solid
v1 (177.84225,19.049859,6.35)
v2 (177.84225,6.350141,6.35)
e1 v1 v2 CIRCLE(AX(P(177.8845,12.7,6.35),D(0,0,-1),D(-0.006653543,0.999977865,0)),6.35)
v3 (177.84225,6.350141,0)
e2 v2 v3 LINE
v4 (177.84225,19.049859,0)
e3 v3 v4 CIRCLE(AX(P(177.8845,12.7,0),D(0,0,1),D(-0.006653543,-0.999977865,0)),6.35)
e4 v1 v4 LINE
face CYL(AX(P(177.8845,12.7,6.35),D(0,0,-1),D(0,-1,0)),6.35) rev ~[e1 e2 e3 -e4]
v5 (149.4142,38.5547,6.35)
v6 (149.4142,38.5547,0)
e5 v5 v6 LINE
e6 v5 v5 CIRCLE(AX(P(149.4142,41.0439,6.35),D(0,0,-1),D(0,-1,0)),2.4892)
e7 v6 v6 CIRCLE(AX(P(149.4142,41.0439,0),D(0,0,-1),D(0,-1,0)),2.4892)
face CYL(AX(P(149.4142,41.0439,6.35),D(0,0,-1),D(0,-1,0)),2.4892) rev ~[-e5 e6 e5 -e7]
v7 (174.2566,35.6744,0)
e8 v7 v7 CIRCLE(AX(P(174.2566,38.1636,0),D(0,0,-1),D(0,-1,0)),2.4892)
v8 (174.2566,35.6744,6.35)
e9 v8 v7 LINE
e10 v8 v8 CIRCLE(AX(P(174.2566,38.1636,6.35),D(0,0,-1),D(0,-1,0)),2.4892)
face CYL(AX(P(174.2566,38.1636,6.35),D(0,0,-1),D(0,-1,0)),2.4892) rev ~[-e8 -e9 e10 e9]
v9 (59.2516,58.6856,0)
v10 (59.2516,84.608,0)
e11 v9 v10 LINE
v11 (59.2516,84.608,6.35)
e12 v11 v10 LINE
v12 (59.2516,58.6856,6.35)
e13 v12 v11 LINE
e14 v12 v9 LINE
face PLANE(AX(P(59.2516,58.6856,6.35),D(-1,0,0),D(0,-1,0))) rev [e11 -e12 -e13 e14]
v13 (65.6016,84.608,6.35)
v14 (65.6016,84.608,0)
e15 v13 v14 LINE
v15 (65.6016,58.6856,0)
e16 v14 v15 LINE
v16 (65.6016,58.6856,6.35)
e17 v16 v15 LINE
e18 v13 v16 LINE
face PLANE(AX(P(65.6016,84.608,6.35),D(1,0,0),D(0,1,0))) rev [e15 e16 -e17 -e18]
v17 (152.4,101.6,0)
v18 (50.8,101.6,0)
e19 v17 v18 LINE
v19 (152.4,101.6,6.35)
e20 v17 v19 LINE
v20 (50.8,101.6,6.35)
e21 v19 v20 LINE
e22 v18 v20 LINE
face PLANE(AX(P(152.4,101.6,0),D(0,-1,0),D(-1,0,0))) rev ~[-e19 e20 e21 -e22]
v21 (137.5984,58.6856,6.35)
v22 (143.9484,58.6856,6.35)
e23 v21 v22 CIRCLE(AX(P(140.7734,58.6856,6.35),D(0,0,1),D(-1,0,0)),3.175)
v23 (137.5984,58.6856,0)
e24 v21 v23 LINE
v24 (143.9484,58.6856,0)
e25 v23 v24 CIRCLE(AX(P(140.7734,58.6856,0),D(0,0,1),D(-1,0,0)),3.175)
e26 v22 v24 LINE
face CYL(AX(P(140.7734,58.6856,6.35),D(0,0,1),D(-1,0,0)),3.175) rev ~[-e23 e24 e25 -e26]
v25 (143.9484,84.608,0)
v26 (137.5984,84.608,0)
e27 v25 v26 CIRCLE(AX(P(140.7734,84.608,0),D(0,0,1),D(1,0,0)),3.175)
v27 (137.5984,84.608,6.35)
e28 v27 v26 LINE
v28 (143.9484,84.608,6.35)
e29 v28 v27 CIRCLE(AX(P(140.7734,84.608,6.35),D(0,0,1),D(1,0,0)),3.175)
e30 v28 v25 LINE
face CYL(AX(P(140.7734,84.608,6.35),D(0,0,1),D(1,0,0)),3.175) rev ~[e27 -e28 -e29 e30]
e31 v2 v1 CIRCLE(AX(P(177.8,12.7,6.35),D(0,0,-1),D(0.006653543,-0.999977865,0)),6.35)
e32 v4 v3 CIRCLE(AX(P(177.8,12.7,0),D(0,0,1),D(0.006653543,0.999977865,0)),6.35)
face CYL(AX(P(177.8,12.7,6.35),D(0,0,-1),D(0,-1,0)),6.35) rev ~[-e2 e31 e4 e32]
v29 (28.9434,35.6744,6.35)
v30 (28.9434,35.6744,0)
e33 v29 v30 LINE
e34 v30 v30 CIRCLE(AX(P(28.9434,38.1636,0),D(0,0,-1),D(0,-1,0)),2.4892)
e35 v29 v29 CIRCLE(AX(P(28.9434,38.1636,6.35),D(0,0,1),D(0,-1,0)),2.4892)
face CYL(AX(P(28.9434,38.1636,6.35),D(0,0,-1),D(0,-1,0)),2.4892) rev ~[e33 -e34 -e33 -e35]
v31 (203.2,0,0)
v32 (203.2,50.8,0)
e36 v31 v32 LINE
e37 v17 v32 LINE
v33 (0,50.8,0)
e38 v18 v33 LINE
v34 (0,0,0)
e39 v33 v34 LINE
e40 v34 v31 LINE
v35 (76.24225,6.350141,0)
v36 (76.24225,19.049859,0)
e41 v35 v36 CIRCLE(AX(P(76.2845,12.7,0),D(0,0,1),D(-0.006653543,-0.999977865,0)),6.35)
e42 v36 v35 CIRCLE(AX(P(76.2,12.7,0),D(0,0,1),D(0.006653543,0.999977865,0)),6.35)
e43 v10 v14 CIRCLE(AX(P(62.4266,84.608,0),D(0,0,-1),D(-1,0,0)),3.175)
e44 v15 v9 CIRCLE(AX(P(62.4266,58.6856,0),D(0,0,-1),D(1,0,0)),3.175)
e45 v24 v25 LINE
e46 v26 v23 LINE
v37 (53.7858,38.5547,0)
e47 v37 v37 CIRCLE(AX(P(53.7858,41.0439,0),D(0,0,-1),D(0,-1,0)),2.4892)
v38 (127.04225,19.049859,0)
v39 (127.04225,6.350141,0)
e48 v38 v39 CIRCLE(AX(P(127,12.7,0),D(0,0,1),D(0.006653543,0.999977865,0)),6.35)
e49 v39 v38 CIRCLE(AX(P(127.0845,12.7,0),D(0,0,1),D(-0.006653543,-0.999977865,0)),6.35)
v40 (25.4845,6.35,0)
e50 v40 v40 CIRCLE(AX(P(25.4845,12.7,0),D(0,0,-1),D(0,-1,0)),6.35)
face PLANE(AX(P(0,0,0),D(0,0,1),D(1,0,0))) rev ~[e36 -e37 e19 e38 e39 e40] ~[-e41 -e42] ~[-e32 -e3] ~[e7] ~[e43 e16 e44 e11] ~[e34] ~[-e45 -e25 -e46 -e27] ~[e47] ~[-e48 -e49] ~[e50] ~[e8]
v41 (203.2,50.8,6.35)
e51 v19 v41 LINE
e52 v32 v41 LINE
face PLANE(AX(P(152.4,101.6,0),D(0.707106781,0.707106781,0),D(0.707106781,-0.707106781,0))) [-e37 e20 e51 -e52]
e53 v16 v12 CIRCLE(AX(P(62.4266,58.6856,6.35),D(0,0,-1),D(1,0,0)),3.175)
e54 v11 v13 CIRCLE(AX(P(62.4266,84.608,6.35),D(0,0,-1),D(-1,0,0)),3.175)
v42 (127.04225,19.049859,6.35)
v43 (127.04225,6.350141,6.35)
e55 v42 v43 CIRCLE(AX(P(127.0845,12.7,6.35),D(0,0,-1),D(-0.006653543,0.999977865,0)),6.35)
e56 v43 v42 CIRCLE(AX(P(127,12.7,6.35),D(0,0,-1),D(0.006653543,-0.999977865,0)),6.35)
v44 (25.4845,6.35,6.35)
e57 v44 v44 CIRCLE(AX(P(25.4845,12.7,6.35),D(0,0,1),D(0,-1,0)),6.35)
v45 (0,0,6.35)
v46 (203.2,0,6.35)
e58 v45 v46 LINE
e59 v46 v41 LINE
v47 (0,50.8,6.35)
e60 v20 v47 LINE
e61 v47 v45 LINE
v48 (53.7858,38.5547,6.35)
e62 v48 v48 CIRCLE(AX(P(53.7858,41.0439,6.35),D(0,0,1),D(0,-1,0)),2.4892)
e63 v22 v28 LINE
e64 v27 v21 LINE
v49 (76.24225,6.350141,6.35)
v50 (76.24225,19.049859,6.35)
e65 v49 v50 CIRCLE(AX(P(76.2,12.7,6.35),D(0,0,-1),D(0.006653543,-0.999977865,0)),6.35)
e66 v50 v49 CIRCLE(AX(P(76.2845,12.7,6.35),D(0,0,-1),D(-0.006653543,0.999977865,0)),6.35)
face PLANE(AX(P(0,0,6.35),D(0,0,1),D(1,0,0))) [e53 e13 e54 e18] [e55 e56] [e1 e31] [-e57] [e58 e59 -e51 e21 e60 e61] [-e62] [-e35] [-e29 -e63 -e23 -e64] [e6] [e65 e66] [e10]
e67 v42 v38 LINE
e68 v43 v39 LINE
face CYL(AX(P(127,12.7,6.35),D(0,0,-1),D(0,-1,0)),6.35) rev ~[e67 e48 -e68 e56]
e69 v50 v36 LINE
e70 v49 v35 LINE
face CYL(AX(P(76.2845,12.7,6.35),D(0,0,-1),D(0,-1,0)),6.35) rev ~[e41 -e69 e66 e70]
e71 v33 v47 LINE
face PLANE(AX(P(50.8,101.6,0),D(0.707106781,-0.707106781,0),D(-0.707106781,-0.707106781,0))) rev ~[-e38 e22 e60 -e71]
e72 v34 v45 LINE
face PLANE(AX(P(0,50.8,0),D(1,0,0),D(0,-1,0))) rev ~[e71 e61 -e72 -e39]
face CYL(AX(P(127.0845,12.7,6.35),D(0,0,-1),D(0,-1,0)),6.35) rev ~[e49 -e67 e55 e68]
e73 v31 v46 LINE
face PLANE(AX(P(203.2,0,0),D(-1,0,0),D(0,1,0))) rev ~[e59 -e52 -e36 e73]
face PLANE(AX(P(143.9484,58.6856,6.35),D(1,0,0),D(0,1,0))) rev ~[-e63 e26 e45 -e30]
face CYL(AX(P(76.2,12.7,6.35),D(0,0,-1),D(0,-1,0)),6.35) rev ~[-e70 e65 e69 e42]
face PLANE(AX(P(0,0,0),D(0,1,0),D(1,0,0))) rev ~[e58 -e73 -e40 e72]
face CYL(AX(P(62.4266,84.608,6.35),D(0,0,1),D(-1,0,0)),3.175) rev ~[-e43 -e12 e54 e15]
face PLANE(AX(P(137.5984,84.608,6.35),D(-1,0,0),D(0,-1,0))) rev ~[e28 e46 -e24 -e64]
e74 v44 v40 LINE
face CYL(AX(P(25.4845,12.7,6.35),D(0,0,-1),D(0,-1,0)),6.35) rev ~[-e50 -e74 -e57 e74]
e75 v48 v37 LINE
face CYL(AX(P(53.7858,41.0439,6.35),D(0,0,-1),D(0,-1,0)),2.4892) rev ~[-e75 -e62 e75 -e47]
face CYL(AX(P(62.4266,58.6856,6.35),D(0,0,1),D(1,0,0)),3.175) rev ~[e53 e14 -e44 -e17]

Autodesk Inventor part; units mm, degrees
ref_plane "XZ Plane" through (0, 0, 0) normal (0, 1, 0) x (-1, 0, 0)
ref_plane "XY Plane" through (0, 0, 0) normal (0, 0, 1) x (1, 0, 0)
sketch "Sketch1" plane through (0, 0, 0) normal (0, 0, 1) x (1, 0, 0)
  line L0 (0, 0) -> (203.2, 0)
  line L1 (203.2, 0) -> (203.2, 50.8)
  line L2 (152.4, 101.6) -> (50.8, 101.6)
  line L3 (0, 50.8) -> (0, 0)
  line L4 (50.8, 101.6) -> (0, 50.8)
  line L5 (152.4, 101.6) -> (203.2, 50.8)
  point P0 (203.2, 101.6)
  point P1 (0, 101.6)
  dimension "d0" = 50.8
  dimension "d1" = 50.8
  dimension "d2" = 50.8
  dimension "d3" = 50.8
  dimension "d7" = 203.2
  dimension "d8" = 101.6
extrude "Extrusion1" add sketch "Sketch1" along normal blind 6.35
sketch "Sketch2" plane through (0, 0, 6.35) normal (0, 0, 1) x (1, 0, 0)
  line L0 (0, 0) -> (203.2, 0) projected
  line L1 (0, 0) -> (203.2, 0) projected
  line L2 (203.2, 0) -> (203.2, 50.8) projected
  line L3 (203.2, 50.8) -> (152.4, 101.6) projected
  line L4 (152.4, 101.6) -> (50.8, 101.6) projected
  line L5 (50.8, 101.6) -> (0, 50.8) projected
  line L6 (0, 50.8) -> (0, 0) projected
  point P0 (25.4, 12.7)
  point P1 (76.1155, 12.7)
  dimension "d6" = 12.7
  dimension "d9" = 25.4
hole "Hole1" at (25.4, 12.7, 6.35) at (76.1155, 12.7, 6.35) direction (0, 0, -1) diameter 12.7 depth 25.4 tip angle 118
pattern_linear "Rectangular Pattern1" count 4 spacing 50.8 along (1, 0, 0) of "Hole1" first direction both ways yes
sketch "Sketch3" plane through (0, 0, 6.35) normal (0, 0, 1) x (1, 0, 0)
  line L0 (0, 0) -> (203.2, 0) projected
  line L1 (203.2, 0) -> (203.2, 50.8) projected
  line L2 (203.2, 50.8) -> (152.4, 101.6) projected
  line L3 (152.4, 101.6) -> (50.8, 101.6) projected
  line L4 (50.8, 101.6) -> (0, 50.8) projected
  line L5 (0, 50.8) -> (0, 0) projected
  arc A0 (76.1577, 6.3501) -> (76.1577, 19.0499) centre (76.2, 12.7) ccw projected
  arc A1 (76.1577, 19.0499) -> (76.1577, 6.3501) centre (76.1155, 12.7) ccw projected
  circle A2 centre (177.7155, 12.7) radius 6.35 projected
  arc A3 (126.9577, 6.3501) -> (126.9577, 19.0499) centre (127, 12.7) ccw projected
  arc A4 (126.9577, 19.0499) -> (126.9577, 6.3501) centre (126.9155, 12.7) ccw projected
  arc A5 (25.3577, 19.0499) -> (25.3577, 6.3501) centre (25.3155, 12.7) ccw projected
  arc A6 (25.3577, 6.3501) -> (25.3577, 19.0499) centre (25.4, 12.7) ccw projected
  line L6 (140.7734, 84.608) -> (140.7734, 58.6856) construction
  line L7 (152.4, 101.6) -> (50.8, 101.6) projected
  line L8 (137.5984, 84.608) -> (137.5984, 58.6856)
  line L9 (143.9484, 58.6856) -> (143.9484, 84.608)
  arc A7 (143.9484, 84.608) -> (137.5984, 84.608) centre (140.7734, 84.608) ccw
  arc A8 (137.5984, 58.6856) -> (143.9484, 58.6856) centre (140.7734, 58.6856) ccw
  point P0 (140.7734, 71.6468)
  point P1 (174.2566, 38.1636)
  point P2 (149.4142, 41.0439)
  dimension "d20" = 6.35
hole "Hole2" at (174.2566, 38.1636, 6.35) at (149.4142, 41.0439, 6.35) direction (0, 0, -1) diameter 4.9784 depth 19.05 tip angle 118 thread size "1/4-20 UNC" class "2B" standard "ANSI Unified Screw Threads"
extrude "Extrusion2" cut sketch "Sketch3" against normal blind 6.35 contours A7 L9 A8 L8
sketch "Sketch4" plane through (0, 0, 0) normal (0, 0, -1) x (-1, 0, 0)
  arc A0 (-143.9484, 58.6856) -> (-137.5984, 58.6856) centre (-140.7734, 58.6856) ccw projected
  line L0 (-143.9484, 58.6856) -> (-143.9484, 84.608) projected
  arc A1 (-137.5984, 84.608) -> (-143.9484, 84.608) centre (-140.7734, 84.608) ccw projected
  line L1 (-137.5984, 84.608) -> (-137.5984, 58.6856) projected
  circle A2 centre (-174.2566, 38.1636) radius 2.4892 projected
  circle A3 centre (-149.4142, 41.0439) radius 2.4892 projected
  line L2 (0, 0) -> (-203.2, 0) projected
  line L3 (0, 50.8) -> (0, 0) projected
  line L4 (-50.8, 101.6) -> (0, 50.8) projected
  line L5 (-152.4, 101.6) -> (-50.8, 101.6) projected
  line L6 (-203.2, 50.8) -> (-152.4, 101.6) projected
  line L7 (-203.2, 0) -> (-203.2, 50.8) projected
  arc A4 (-25.3577, 6.3501) -> (-25.3577, 19.0499) centre (-25.3155, 12.7) ccw projected
  arc A5 (-25.3577, 19.0499) -> (-25.3577, 6.3501) centre (-25.4, 12.7) ccw projected
  circle A6 centre (-177.7155, 12.7) radius 6.35 projected
  arc A7 (-126.9577, 19.0499) -> (-126.9577, 6.3501) centre (-127, 12.7) ccw projected
  arc A8 (-126.9577, 6.3501) -> (-126.9577, 19.0499) centre (-126.9155, 12.7) ccw projected
  arc A9 (-76.1577, 19.0499) -> (-76.1577, 6.3501) centre (-76.2, 12.7) ccw projected
  arc A10 (-76.1577, 6.3501) -> (-76.1577, 19.0499) centre (-76.1155, 12.7) ccw projected
  line L8 (-152.4, 101.6) -> (-50.8, 101.6) projected
  line L9 (-101.6, 101.6) -> (-101.6, 0)
  line L10 (0, 0) -> (-203.2, 0) projected
ref_plane "Work Plane1" through (101.6, 101.6, 0) normal (1, 0, 0) x (0, -1, 0)
mirror "Mirror1" about plane through (101.6, 101.6, 0) normal (1, 0, 0) of "Extrusion2", "Hole2"
mirror "Mirror2" about plane through (101.6, 101.6, 0) normal (1, 0, 0) of "Extrusion1", "Extrusion2", "Hole2", "Mirror1", "Hole1", "Rectangular Pattern1"
sketch "Sketch5" plane through (0, 0, 0) normal (0, 0, -1) x (-1, 0, 0)
  line L0 (-91.0569, 50.3137) -> (-46.6879, 50.3137) construction
  line L1 (-46.6879, 50.3137) -> (-46.6879, 47.0459) construction
  line L2 (-46.6879, 47.0459) -> (-91.0569, 47.0459) construction
  line L3 (-91.0569, 47.0459) -> (-91.0569, 50.3137) construction
  point P0 (0, 0)
equation "\"d1\" = d0"
equation "\"d3\" = d2"
properties part number "junk" material "Water"
